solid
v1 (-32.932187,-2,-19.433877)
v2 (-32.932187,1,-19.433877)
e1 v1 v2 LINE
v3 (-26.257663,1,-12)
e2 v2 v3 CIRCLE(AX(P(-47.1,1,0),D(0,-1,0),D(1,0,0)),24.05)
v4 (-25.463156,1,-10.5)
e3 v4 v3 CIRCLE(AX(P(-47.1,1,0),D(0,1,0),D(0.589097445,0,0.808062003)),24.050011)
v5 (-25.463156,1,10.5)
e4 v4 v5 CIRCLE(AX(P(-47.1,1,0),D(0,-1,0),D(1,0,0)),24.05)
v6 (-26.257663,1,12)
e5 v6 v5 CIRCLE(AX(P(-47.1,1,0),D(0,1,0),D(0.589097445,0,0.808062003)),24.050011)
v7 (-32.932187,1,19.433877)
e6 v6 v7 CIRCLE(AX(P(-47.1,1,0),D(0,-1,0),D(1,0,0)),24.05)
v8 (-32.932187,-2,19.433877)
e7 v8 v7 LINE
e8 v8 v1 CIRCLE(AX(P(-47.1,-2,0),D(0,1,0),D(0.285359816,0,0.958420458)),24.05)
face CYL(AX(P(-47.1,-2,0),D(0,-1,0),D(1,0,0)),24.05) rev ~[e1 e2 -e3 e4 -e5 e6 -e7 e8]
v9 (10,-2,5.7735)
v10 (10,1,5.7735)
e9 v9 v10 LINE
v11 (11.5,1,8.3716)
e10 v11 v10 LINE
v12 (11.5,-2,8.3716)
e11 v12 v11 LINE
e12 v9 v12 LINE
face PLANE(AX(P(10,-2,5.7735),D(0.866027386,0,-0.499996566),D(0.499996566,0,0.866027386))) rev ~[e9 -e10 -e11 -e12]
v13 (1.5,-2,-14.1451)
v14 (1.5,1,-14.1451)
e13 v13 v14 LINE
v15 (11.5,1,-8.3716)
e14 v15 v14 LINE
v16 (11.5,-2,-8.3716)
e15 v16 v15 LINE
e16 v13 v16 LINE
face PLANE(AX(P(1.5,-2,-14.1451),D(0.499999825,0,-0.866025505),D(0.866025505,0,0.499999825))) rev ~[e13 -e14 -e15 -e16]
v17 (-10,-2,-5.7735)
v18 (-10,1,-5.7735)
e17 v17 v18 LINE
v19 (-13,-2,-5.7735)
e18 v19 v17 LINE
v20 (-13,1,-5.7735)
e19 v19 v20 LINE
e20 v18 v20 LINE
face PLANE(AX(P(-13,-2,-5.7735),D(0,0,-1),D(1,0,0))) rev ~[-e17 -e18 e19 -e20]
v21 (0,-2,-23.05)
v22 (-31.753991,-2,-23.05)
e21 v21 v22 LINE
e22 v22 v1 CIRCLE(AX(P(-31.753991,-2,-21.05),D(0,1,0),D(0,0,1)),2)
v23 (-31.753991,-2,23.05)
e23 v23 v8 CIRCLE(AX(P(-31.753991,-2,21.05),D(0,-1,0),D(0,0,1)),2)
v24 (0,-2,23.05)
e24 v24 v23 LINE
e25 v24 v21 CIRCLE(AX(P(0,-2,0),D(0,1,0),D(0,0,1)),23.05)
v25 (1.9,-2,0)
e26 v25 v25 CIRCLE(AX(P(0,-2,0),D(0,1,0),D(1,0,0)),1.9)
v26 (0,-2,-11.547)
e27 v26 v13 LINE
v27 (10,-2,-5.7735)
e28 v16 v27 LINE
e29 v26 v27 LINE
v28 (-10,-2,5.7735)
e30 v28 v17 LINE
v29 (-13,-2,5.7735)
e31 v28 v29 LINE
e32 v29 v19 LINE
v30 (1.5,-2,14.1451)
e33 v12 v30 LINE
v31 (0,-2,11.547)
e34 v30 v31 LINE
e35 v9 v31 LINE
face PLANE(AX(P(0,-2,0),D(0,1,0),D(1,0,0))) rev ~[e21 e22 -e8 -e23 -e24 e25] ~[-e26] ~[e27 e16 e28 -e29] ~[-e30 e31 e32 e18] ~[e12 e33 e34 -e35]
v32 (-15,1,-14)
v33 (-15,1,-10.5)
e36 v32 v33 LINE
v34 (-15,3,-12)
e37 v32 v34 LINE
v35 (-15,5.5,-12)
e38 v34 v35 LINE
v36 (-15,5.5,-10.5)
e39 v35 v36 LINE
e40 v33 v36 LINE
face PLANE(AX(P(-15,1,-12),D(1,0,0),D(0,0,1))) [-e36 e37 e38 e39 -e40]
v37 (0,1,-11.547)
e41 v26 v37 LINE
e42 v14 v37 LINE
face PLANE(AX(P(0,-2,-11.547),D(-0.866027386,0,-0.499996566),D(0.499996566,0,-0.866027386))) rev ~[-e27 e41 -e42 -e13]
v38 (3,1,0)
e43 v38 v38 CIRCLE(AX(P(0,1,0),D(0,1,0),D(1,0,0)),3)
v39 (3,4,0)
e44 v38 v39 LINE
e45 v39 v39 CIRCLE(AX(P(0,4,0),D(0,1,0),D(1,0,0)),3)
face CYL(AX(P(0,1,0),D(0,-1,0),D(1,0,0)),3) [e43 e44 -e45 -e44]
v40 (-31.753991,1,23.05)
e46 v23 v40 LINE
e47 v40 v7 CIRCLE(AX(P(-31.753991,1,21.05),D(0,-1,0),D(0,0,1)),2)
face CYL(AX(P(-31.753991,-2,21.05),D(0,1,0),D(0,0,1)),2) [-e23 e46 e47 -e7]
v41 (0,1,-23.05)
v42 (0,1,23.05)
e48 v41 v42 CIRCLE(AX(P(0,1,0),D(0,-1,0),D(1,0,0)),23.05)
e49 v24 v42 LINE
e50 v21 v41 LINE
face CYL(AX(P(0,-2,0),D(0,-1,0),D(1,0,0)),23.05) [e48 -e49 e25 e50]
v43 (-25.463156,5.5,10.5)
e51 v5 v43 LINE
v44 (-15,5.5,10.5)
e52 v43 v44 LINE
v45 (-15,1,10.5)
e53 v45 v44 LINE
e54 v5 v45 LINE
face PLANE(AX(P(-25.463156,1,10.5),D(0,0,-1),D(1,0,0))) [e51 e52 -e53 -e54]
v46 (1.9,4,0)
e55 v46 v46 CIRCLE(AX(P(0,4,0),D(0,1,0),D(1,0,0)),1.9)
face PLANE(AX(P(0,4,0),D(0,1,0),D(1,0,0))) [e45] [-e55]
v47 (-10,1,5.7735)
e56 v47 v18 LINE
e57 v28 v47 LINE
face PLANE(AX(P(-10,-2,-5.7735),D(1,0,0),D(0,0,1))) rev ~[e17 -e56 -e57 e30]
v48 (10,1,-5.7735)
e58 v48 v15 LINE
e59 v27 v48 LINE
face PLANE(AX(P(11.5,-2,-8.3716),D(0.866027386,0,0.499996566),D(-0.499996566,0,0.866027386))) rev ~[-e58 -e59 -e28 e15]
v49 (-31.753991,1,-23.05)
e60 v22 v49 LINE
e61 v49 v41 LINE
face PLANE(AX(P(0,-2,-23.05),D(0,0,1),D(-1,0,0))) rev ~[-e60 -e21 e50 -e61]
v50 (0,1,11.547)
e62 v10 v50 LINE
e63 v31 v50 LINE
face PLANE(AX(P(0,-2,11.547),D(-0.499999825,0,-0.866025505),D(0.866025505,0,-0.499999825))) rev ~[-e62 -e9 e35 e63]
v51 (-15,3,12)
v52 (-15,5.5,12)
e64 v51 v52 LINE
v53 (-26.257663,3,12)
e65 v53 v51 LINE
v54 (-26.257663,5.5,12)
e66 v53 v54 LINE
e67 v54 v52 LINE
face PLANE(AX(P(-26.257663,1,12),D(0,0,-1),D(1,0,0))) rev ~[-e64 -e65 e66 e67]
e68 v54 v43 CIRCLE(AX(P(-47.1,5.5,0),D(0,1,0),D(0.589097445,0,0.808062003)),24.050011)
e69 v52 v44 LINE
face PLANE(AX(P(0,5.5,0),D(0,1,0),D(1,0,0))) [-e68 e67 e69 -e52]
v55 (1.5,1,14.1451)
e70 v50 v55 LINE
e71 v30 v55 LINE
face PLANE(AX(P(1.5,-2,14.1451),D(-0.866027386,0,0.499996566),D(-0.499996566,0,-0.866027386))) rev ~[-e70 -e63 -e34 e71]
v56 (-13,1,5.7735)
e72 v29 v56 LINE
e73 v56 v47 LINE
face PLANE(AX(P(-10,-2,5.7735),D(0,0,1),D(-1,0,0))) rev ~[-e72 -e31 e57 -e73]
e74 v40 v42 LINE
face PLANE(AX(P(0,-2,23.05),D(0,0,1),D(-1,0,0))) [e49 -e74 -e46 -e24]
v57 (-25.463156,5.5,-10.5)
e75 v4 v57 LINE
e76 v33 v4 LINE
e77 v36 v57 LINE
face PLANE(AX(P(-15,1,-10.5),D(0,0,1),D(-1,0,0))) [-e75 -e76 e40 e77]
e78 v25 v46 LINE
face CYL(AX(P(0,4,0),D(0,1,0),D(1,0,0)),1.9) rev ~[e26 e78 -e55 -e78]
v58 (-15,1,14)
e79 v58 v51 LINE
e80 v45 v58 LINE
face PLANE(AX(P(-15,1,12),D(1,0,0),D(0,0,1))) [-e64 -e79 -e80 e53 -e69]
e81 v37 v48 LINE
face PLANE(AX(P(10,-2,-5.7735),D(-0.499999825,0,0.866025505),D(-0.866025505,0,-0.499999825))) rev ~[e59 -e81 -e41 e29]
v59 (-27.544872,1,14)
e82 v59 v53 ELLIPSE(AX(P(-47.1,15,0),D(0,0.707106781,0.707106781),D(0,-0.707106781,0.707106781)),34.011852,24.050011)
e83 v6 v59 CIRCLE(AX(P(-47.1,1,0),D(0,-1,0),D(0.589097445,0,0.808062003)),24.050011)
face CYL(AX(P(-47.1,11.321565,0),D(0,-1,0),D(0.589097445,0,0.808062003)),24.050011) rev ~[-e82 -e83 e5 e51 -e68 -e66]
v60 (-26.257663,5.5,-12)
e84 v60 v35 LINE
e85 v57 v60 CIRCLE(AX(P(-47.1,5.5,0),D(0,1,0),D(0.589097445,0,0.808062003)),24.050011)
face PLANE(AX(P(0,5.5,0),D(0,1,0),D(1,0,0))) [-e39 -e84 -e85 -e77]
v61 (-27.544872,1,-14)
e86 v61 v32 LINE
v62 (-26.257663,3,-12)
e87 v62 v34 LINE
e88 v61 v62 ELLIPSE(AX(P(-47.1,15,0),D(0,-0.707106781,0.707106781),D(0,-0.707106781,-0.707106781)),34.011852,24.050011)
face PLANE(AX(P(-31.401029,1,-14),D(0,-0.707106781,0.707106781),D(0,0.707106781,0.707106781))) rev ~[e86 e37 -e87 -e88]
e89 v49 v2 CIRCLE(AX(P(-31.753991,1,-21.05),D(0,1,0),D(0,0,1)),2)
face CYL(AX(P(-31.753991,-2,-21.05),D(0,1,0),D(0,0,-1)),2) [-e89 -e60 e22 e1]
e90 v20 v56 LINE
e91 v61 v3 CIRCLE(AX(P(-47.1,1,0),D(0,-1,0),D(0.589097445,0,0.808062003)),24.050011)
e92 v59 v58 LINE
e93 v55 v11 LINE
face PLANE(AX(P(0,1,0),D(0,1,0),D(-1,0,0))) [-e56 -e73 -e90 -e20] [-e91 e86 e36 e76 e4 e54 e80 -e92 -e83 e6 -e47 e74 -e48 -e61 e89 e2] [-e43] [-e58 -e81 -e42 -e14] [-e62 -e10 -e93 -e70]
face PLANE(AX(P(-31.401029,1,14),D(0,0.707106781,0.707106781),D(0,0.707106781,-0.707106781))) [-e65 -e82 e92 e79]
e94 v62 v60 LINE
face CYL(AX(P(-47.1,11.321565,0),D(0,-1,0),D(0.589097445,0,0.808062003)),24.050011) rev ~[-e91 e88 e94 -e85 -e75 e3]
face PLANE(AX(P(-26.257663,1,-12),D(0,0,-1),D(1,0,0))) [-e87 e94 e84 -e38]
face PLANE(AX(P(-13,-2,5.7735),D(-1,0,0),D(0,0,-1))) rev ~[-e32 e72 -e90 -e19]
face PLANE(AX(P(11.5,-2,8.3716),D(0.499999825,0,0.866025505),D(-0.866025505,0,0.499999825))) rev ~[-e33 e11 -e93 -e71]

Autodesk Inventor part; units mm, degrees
ref_plane "YZ Plane" through (0, 0, 0) normal (1, 0, 0) x (0, 1, 0)
ref_plane "XZ Plane" through (0, 0, 0) normal (0, 1, 0) x (-1, 0, 0)
ref_plane "XY Plane" through (0, 0, 0) normal (0, 0, 1) x (1, 0, 0)
sketch "スケッチ1" plane through (0, 0, 0) normal (0, 1, 0) x (-1, 0, 0)
  circle A0 centre (0, 0) radius 6
  dimension "d0" = 12
extrude "押し出し1" add sketch "スケッチ1" along normal blind 1
sketch "スケッチ2" plane through (0, 1, 0) normal (0, 1, 0) x (1, 0, 0)
  circle A0 centre (0, 0) radius 3
  dimension "d3" = 6
extrude "押し出し2" add sketch "スケッチ2" along normal blind 3
sketch "スケッチ3" plane through (0, 4, 0) normal (0, 1, 0) x (1, 0, 0)
  circle A0 centre (0, 0) radius 1.9
  dimension "d6" = 3.8
extrude "押し出し3" cut sketch "スケッチ3" against normal through all
sketch "スケッチ4" plane through (0, 1, 0) normal (0, 1, 0) x (1, 0, 0)
  circle A0 centre (0, 0) radius 23.55
  circle A1 centre (-47.1, 0) radius 23.55
  line L0 (-47.1, 23.55) -> (0, 23.55)
  line L1 (0, -23.55) -> (-47.1, -23.55)
  circle A2 centre (0, 0) radius 1.9 projected
  dimension "d11" = 47.1
extrude "押し出し4" add sketch "スケッチ4" against normal blind 3 contours A0 | A0 A1 L0 | L1 A1 A0
sketch "スケッチ5" plane through (0, -2, 0) normal (0, -1, 0) x (1, 0, 0)
  circle A0 centre (0, 0) radius 23.05
  circle A1 centre (-47.1, 0) radius 24.05
  arc A2 (0, -23.55) -> (0, 23.55) centre (0, 0) ccw projected
  arc A3 (-47.1, -23.55) -> (-47.1, 23.55) centre (-47.1, 0) ccw projected
  line L0 (0, 23.05) -> (-40.2371, 23.05)
  line L1 (0, -23.05) -> (-40.2371, -23.05)
  line L2 (30, 40) -> (-80, 40)
  line L3 (-80, 40) -> (-80, -50)
  line L4 (-80, -50) -> (30, -50)
  line L5 (30, -50) -> (30, 40)
  dimension "d14" = 0.5
  dimension "d15" = 0.5
extrude "押し出し5" cut sketch "スケッチ5" against normal through all contours A1 | L5 L4 L3 L2
fillet "フィレット1" radius 2 2 edges at (-40.2371, -0.5, 23.05) (-40.2371, -0.5, -23.05)
sketch "スケッチ6" plane through (0, -2, 0) normal (0, -1, 0) x (1, 0, 0)
  circle A0 centre (0, 0) radius 10
  line L0 (10, 5.7735) -> (10, -5.7735)
  line L1 (10, -5.7735) -> (0, -11.547)
  line L2 (0, -11.547) -> (-10, -5.7735)
  line L3 (-10, -5.7735) -> (-10, 5.7735)
  line L4 (-10, 5.7735) -> (0, 11.547)
  line L5 (0, 11.547) -> (10, 5.7735)
  line L6 (-10, -5.7735) -> (-10, 5.7735)
  line L7 (-10, 5.7735) -> (-13, 5.7735)
  line L8 (-13, 5.7735) -> (-13, -5.7735)
  line L9 (-13, -5.7735) -> (-10, -5.7735)
  line L10 (0, 11.547) -> (10, 5.7735)
  line L11 (10, 5.7735) -> (11.5, 8.3716)
  line L12 (11.5, 8.3716) -> (1.5, 14.1451)
  line L13 (1.5, 14.1451) -> (0, 11.547)
  line L14 (10, -5.7735) -> (0, -11.547)
  line L15 (0, -11.547) -> (1.5, -14.1451)
  line L16 (1.5, -14.1451) -> (11.5, -8.3716)
  line L17 (11.5, -8.3716) -> (10, -5.7735)
  point P0 (10, -5.7735)
  dimension "d19" = 20
  dimension "d20" = 3
  dimension "d21" = 3
  dimension "d22" = 3
extrude "押し出し6" cut sketch "スケッチ6" against normal through all contours L5 L13 L12 L11 | L1 L17 L16 L15 | L3 L9 L8 L7
sketch "スケッチ7" plane through (0, 1, 0) normal (0, 1, 0) x (1, 0, 0)
  line L0 (0, 10.5) -> (-45, 10.5)
  line L1 (-45, 10.5) -> (-45, -10.5)
  line L2 (-45, -10.5) -> (0, -10.5)
  line L3 (0, -10.5) -> (0, 10.5)
  line L4 (-15, 10.5) -> (-45, 10.5)
  line L5 (-45, 10.5) -> (-45, 12)
  line L6 (-45, 12) -> (-15, 12)
  line L7 (-15, 12) -> (-15, 10.5)
  line L8 (-15, -10.5) -> (-45, -10.5)
  line L9 (-45, -10.5) -> (-45, -12)
  line L10 (-45, -12) -> (-15, -12)
  line L11 (-15, -12) -> (-15, -10.5)
  arc A0 (-32.9322, -19.4339) -> (-32.9322, 19.4339) centre (-47.1, 0) ccw projected
  point P0 (0, 0)
  point P1 (0, 0)
  point P2 (-25.4632, -10.5)
  point P3 (-26.2577, -12)
  point P4 (-26.2577, 12)
  point P5 (-25.4632, 10.5)
  dimension "d25" = 21
  dimension "d26" = 15
  dimension "d27" = 1.5
  dimension "d28" = 1.5
extrude "押し出し7" add sketch "スケッチ7" along normal blind 4.5 contours L0 A0 L6 L7 | L11 L10 A0 L2
chamfer "面取り1" distance 2 angle 45 2 edges at (-20.6288, 1, 12) (-20.6288, 1, -12)
properties part number "ベルト_bush_upper"
